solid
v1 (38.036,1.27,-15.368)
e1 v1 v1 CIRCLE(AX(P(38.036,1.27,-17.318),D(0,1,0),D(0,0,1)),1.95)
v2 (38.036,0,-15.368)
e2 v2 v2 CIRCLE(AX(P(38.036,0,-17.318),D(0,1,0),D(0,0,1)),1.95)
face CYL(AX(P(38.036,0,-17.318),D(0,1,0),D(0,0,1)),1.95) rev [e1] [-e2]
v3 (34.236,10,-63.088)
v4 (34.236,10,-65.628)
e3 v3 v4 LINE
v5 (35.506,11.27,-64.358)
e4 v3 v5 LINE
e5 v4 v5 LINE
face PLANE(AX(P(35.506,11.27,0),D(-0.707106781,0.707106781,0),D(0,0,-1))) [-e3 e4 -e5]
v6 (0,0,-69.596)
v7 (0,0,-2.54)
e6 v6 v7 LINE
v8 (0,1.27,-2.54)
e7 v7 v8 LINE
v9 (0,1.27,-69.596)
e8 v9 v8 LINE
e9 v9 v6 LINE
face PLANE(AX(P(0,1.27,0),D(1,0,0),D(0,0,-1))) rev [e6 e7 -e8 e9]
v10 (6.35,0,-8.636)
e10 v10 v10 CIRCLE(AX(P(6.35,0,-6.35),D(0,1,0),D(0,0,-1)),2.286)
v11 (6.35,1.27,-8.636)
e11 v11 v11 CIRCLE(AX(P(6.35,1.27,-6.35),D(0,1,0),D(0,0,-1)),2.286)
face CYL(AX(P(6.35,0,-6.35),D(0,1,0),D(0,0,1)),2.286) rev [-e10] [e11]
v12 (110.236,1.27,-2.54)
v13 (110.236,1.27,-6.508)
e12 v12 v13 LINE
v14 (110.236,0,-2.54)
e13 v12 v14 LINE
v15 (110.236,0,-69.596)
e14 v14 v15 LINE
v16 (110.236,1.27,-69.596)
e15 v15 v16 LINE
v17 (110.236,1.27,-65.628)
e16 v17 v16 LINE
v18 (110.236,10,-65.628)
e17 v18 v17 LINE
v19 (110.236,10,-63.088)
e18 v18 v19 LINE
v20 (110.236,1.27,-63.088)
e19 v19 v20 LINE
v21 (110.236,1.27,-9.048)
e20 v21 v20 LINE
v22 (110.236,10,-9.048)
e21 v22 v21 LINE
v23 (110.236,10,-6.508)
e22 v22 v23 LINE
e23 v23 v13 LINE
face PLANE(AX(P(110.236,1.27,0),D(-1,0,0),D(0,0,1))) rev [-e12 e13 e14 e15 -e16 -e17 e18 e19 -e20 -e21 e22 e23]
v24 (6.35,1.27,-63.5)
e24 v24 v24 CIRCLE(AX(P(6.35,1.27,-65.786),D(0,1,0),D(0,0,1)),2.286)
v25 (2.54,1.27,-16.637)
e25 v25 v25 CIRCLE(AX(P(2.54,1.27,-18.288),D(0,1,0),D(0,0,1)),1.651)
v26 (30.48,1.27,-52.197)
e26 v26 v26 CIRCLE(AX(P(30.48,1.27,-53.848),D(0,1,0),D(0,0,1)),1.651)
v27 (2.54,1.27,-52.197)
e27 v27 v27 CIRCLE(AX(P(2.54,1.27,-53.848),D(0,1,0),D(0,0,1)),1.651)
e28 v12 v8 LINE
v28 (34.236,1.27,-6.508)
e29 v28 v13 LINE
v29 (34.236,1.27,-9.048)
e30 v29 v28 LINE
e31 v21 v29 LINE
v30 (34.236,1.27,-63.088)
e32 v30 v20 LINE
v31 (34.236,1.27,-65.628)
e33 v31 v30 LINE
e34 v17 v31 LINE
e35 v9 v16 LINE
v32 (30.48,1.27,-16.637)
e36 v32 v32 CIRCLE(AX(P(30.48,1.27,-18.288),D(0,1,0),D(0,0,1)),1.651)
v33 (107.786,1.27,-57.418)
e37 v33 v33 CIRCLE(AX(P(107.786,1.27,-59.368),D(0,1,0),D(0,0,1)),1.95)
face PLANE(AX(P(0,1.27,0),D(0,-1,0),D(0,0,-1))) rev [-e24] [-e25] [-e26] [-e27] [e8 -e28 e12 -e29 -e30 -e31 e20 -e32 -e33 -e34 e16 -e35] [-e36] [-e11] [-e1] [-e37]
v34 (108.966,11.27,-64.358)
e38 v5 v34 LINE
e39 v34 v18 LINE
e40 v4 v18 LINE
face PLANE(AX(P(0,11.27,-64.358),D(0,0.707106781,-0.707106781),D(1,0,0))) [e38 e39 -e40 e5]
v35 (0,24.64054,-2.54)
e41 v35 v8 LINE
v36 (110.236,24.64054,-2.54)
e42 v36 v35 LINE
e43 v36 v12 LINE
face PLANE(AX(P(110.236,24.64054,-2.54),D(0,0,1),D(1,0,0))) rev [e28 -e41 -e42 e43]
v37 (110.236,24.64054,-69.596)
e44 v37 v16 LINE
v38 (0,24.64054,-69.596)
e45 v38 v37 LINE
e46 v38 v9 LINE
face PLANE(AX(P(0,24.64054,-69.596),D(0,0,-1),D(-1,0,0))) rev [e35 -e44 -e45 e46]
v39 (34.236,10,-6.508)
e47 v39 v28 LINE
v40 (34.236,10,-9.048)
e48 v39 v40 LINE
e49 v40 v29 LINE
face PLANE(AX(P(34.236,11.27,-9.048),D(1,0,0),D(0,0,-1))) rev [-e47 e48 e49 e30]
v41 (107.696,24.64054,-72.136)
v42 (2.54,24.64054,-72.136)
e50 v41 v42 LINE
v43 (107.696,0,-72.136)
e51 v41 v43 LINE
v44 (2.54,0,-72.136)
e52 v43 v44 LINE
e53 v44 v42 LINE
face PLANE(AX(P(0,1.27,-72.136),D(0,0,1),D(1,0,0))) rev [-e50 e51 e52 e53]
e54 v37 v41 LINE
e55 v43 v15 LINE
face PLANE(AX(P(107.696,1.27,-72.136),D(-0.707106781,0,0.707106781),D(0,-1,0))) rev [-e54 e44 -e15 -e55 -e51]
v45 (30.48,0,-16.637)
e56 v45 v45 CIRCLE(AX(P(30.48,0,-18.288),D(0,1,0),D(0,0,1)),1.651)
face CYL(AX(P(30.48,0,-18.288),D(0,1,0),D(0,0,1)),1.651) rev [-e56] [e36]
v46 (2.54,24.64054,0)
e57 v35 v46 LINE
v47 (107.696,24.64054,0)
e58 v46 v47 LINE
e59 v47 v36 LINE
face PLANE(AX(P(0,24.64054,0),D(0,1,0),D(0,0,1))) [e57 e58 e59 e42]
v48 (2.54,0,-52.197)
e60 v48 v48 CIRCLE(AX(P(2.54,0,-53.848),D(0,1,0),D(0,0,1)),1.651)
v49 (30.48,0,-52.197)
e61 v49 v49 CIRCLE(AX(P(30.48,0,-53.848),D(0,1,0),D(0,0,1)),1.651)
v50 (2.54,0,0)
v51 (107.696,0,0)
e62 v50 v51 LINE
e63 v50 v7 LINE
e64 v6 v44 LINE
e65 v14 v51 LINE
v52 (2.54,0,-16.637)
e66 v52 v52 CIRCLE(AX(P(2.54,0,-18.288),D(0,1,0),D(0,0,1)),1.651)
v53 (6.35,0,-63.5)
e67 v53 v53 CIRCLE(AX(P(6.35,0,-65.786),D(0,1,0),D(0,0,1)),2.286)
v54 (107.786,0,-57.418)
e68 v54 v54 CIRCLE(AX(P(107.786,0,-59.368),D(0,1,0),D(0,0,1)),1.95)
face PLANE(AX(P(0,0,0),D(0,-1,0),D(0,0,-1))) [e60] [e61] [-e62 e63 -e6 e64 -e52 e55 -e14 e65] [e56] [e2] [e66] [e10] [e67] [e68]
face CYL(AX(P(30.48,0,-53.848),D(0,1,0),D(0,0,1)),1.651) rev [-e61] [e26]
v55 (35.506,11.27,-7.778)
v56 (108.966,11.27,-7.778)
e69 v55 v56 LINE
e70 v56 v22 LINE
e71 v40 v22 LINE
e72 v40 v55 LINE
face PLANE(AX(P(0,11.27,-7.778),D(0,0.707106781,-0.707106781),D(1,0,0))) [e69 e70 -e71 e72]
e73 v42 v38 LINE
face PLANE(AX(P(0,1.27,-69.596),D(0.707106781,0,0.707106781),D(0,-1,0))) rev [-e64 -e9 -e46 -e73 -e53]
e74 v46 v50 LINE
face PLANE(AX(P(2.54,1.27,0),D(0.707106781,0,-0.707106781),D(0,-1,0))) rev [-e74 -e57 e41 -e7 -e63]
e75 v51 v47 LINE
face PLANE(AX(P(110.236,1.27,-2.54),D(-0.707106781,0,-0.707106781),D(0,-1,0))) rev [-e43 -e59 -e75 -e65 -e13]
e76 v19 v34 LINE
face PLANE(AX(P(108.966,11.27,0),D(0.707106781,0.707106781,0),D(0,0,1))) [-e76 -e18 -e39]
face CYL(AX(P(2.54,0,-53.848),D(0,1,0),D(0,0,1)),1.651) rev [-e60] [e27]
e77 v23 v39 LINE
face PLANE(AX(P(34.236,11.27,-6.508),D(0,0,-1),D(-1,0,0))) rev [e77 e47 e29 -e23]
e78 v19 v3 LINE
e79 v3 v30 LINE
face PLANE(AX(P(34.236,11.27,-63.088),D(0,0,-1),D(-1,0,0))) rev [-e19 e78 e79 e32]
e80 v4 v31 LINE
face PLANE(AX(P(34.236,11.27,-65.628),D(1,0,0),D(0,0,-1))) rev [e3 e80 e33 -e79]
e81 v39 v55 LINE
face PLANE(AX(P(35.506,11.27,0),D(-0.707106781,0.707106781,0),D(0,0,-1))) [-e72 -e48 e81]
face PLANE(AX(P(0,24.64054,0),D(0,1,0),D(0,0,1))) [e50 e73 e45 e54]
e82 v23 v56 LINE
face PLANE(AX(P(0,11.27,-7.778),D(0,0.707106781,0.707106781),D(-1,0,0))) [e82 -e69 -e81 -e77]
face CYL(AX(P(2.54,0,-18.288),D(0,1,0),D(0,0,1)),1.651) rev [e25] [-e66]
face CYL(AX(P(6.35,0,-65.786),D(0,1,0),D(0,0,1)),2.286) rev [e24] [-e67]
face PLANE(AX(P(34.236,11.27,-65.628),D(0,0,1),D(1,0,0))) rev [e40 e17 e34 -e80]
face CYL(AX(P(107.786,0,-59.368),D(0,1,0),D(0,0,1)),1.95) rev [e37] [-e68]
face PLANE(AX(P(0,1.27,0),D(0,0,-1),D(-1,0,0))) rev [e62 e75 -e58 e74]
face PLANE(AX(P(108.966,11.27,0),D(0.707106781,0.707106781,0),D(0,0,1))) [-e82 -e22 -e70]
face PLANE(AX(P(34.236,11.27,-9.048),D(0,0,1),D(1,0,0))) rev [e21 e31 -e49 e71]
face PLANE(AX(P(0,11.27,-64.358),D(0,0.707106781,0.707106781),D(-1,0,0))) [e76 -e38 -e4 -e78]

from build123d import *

# Parameters (mm, degrees)
SKETCH1_W               = 110.236
SKETCH1_H               = 72.136
RADIO_MOUNT_PLATE_DEPTH = 1.27
SKETCH2_R               = 1.95
SKETCH2_R_2             = 1.651
CUT_EXTRUDE1_DEPTH      = 132.746692907
SKETCH3_W               = 110.236
SKETCH3_H               = 2.54
BOSS_EXTRUDE2_DEPTH     = 23.37054
SKETCH4_R               = 2.286
CUT_EXTRUDE2_DEPTH      = 134.79746011
SKETCH5_W               = 76
SKETCH5_H               = 2.54
BOSS_EXTRUDE3_DEPTH     = 10
CHAMFER1_SIZE           = 1.27
CHAMFER2_SIZE           = 2.54


with BuildPart() as part:
    # Sketch1 → Radio Mount Plate (new body)
    with BuildSketch(Plane(origin=(0, 0, 0), x_dir=(1, 0, 0), z_dir=(0, 1, 0))):
        with Locations((55.118, 36.068)):
            Rectangle(SKETCH1_W, SKETCH1_H)
    extrude(amount=RADIO_MOUNT_PLATE_DEPTH)

    # Sketch2 → Cut-Extrude1 (cut, through all)
    with BuildSketch(Plane(origin=(0, 1.27, 0), x_dir=(1, 0, 0), z_dir=(0, 1, 0))):
        with Locations(Location((107.786, 59.368, 0), (0, 0, 270))):
            Circle(SKETCH2_R)
        with Locations(Location((38.036, 17.318, 0), (0, 0, 270))):
            Circle(SKETCH2_R)
        with Locations(Location((2.54, 53.848, 0), (0, 0, 270))):
            Circle(SKETCH2_R_2)
        with Locations(Location((30.48, 53.848, 0), (0, 0, 270))):
            Circle(SKETCH2_R_2)
        with Locations(Location((30.48, 18.288, 0), (0, 0, 270))):
            Circle(SKETCH2_R_2)
        with Locations(Location((2.54, 18.288, 0), (0, 0, 270))):
            Circle(SKETCH2_R_2)
    extrude(amount=-CUT_EXTRUDE1_DEPTH, mode=Mode.SUBTRACT)

    # Sketch3 → Boss-Extrude2 (add)
    with BuildSketch(Plane(origin=(0, 1.27, 0), x_dir=(1, 0, 0), z_dir=(0, 1, 0))):
        with Locations((55.118, 70.866)):
            Rectangle(SKETCH3_W, SKETCH3_H)
        with Locations((55.118, 1.27)):
            Rectangle(SKETCH3_W, SKETCH3_H)
    extrude(amount=BOSS_EXTRUDE2_DEPTH)

    # Sketch4 → Cut-Extrude2 (cut, through all)
    with BuildSketch(Plane(origin=(0, 1.27, 0), x_dir=(1, 0, 0), z_dir=(0, 1, 0))):
        with Locations(Location((6.35, 65.786, 0), (0, 0, 270))):
            Circle(SKETCH4_R)
        with Locations(Location((6.35, 6.35, 0), (0, 0, 90))):
            Circle(SKETCH4_R)
    extrude(amount=-CUT_EXTRUDE2_DEPTH, mode=Mode.SUBTRACT)

    # Sketch5 → Boss-Extrude3 (add)
    with BuildSketch(Plane(origin=(0, 1.27, 0), x_dir=(1, 0, 0), z_dir=(0, 1, 0))):
        with Locations((72.236, 64.358)):
            Rectangle(SKETCH5_W, SKETCH5_H)
        with Locations((72.236, 7.778)):
            Rectangle(SKETCH5_W, SKETCH5_H)
    extrude(amount=BOSS_EXTRUDE3_DEPTH)

    # Chamfer1
    chamfer1_edges = [part.edges().sort_by_distance(p)[0] for p in [
        (34.236, 11.27, -64.358),
        (72.236, 11.27, -63.088),
        (110.236, 11.27, -64.358),
        (72.236, 11.27, -65.628),
        (34.236, 11.27, -7.778),
        (72.236, 11.27, -6.508),
        (110.236, 11.27, -7.778),
        (72.236, 11.27, -9.048),
    ]]
    chamfer(chamfer1_edges, length=CHAMFER1_SIZE - 0.0001)  # a hair under: the kernel refuses the full size

    # Chamfer2
    chamfer2_edges = [part.edges().sort_by_distance(p)[0] for p in [
        (110.236, 12.32027, 0),
        (110.236, 12.32027, -72.136),
        (0, 12.32027, -72.136),
        (0, 12.32027, 0),
    ]]
    chamfer(chamfer2_edges, length=CHAMFER2_SIZE - 0.0001)  # a hair under: the kernel refuses the full size


solid = part.part
